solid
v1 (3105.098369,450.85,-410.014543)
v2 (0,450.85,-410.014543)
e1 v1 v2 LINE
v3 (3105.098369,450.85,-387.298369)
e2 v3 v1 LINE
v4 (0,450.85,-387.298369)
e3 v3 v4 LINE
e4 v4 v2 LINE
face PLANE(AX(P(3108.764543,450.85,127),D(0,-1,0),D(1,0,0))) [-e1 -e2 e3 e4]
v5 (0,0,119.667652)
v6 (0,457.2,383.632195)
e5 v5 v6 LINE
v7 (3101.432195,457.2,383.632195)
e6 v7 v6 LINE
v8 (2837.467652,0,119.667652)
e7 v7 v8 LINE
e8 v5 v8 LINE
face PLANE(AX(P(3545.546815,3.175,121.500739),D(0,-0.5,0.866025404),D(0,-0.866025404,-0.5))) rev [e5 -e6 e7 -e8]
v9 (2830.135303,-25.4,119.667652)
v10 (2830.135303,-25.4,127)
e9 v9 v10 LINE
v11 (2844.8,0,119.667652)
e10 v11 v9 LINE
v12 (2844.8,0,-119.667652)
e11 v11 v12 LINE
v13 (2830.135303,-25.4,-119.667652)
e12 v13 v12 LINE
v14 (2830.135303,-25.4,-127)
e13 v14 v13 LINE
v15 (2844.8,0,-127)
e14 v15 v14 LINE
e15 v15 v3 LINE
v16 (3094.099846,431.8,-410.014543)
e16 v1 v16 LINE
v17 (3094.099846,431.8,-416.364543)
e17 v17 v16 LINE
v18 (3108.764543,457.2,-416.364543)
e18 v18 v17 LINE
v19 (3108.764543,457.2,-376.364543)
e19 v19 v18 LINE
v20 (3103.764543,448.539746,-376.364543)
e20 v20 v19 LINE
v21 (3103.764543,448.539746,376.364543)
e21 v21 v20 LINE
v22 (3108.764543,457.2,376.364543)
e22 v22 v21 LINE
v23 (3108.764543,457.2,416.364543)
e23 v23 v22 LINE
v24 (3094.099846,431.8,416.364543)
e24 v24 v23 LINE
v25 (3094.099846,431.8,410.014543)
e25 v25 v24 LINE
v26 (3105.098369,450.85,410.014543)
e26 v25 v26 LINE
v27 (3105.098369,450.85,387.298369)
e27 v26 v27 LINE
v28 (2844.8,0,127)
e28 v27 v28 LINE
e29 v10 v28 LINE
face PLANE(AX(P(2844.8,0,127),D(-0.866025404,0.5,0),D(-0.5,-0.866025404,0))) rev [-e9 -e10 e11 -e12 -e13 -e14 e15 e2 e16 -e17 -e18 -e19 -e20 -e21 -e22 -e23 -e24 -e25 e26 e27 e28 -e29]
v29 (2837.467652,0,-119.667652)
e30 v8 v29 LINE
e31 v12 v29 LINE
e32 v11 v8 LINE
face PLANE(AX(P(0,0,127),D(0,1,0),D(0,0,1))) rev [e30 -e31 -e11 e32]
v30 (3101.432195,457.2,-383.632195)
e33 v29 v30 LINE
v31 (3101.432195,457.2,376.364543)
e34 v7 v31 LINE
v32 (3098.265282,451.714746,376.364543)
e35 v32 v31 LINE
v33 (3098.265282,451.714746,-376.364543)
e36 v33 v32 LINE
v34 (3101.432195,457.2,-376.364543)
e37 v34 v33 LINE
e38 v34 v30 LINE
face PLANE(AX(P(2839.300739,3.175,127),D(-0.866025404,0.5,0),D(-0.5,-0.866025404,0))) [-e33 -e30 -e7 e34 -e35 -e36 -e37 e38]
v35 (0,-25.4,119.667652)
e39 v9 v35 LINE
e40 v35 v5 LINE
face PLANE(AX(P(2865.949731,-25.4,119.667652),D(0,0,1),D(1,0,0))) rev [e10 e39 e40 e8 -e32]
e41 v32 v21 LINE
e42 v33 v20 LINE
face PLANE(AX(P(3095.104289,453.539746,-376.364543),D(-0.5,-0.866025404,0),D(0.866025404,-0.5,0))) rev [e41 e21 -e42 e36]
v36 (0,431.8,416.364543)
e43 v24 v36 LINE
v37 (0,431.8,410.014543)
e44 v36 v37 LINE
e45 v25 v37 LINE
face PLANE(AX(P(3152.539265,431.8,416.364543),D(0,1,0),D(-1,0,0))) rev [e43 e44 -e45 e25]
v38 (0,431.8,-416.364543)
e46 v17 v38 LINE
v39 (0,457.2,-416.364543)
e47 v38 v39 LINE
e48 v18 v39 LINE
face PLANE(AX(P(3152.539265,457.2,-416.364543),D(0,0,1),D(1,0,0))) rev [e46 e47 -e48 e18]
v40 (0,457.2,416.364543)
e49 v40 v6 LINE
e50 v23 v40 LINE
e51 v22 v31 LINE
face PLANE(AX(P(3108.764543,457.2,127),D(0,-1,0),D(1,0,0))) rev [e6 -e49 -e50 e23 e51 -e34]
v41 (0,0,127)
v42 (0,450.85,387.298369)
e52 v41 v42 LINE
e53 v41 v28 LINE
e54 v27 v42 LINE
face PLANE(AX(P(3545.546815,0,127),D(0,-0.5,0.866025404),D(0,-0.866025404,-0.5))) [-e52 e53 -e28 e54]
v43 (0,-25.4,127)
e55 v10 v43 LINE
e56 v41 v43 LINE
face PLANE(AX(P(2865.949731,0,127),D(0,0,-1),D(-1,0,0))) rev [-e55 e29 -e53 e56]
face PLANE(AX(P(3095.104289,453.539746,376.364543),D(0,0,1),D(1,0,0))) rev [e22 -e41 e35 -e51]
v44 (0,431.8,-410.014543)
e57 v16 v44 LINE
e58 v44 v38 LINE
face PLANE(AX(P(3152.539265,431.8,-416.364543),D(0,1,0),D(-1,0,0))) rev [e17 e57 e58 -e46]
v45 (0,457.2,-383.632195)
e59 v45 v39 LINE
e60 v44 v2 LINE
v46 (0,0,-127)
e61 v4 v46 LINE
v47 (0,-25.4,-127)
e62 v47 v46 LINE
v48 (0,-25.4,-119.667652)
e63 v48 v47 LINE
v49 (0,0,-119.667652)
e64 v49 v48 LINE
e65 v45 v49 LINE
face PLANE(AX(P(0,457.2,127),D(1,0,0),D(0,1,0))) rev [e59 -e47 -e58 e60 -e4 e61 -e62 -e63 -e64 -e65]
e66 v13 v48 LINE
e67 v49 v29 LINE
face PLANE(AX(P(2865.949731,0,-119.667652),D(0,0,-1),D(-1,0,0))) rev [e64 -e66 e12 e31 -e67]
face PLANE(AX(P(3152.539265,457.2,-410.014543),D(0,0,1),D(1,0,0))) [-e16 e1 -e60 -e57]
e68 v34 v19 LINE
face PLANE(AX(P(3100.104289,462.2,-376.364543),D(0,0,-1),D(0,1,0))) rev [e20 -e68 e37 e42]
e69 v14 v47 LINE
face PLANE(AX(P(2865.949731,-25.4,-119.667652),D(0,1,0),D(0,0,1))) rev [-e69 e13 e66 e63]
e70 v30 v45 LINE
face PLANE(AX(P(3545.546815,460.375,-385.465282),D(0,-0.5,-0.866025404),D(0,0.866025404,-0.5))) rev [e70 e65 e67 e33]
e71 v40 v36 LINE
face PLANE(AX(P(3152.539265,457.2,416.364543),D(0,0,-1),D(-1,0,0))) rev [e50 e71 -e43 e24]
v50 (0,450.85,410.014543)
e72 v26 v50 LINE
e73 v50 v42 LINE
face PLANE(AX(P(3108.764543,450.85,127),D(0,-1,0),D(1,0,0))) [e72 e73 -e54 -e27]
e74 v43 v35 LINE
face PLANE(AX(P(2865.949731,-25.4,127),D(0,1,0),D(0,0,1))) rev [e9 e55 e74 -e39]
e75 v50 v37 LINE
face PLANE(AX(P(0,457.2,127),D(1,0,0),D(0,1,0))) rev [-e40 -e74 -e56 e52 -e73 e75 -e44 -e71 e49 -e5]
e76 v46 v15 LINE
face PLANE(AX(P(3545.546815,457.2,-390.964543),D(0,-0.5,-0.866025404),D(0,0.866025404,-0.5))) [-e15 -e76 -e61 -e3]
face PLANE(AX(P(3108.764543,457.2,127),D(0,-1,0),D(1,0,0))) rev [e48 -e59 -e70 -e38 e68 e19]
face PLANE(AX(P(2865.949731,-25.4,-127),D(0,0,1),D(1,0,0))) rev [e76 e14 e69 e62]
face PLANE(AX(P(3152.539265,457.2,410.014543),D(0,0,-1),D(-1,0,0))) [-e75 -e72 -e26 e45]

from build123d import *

# Parameters (mm, degrees)
CHUTE_CENTER_DEPTH         = 127
CHUTE_SIDES_REACH          = 3146.77
SHELL1_T                   = -6.35
BOSS_EXTRUDE3_REACH        = 3168.434
SHELL3_DEPTH               = 3105.098368864
BOSS_EXTRUDE4_REACH        = 3171.67
SHELL5_DEPTH               = 3105.098368864
SKETCH11_W                 = 752.729086146
SKETCH11_H                 = 10
CLOSED_END_RELIEF_DEPTH    = 10
LOWER_SUPPORT_FLANGE_REACH = 3171.67
SKETCH12_W                 = 7.332348419
SKETCH12_H                 = 25.4


# Read off the part's stored shape, not the designer's step: Shell3, Shell5
with BuildPart() as part:
    # Sketch1 → Chute Center (new, symmetric)
    with BuildSketch(Plane.XY):
        Polygon((0, 0), (2844.8, 0), (3108.764543073, 457.2), (0, 457.2), align=None)
    extrude(amount=CHUTE_CENTER_DEPTH, both=True)

    # Chute Sides: up to this plane
    chute_sides_end = Plane(origin=(2844.8, 0, 127), z_dir=(-0.8660254037844399, 0.49999999999999784, 0))
    # Sketch2 → Chute Sides (add, up to the surface)
    with BuildSketch(Plane.ZY, mode=Mode.PRIVATE) as chute_sides_sk1:
        Polygon((127, 0), (390.964543073, 457.2), (127, 457.2), align=None)
    chute_sides_tool1 = split(extrude(chute_sides_sk1.sketch, amount=-CHUTE_SIDES_REACH, mode=Mode.PRIVATE), bisect_by=chute_sides_end, keep=Keep.BOTH, mode=Mode.PRIVATE)
    add(chute_sides_tool1.solids().sort_by_distance((0, 304.8, 214.988181))[0])
    # Sketch2 → Chute Sides (add, up to the surface)
    with BuildSketch(Plane.ZY, mode=Mode.PRIVATE) as chute_sides_sk2:
        Polygon((-127, 457.2), (-390.964543073, 457.2), (-127, 0), align=None)
    chute_sides_tool2 = split(extrude(chute_sides_sk2.sketch, amount=-CHUTE_SIDES_REACH, mode=Mode.PRIVATE), bisect_by=chute_sides_end, keep=Keep.BOTH, mode=Mode.PRIVATE)
    add(chute_sides_tool2.solids().sort_by_distance((0, 304.8, -214.988181))[0])

    # Shell1
    shell1_openings = [part.faces().sort_by_distance(p)[0] for p in [
        (1554.382271537, 457.2, 0),
        (1422.4, 0, 0),
        (0, 267.432963474, 0),
    ]]
    offset(amount=SHELL1_T, openings=shell1_openings, kind=Kind.INTERSECTION)

    # Boss-Extrude3: up to this plane
    boss_extrude3_end = Plane(origin=(2844.8, 0, 127), z_dir=(-0.8660254037844399, 0.49999999999999784, 0))
    # Sketch6 → Boss-Extrude3 (add, up to the surface)
    with BuildSketch(Plane(origin=(0, 0, 0), x_dir=(0, 0, -1), z_dir=(1, 0, 0)), mode=Mode.PRIVATE) as boss_extrude3_sk1:
        Polygon((390.964543073, 457.2), (416.364543073, 457.2), (416.364543073, 431.8), (376.299846236, 431.8), align=None)
    boss_extrude3_tool1 = split(extrude(boss_extrude3_sk1.sketch, amount=BOSS_EXTRUDE3_REACH, mode=Mode.PRIVATE), bisect_by=boss_extrude3_end, keep=Keep.BOTH, mode=Mode.PRIVATE)
    add(boss_extrude3_tool1.solids().sort_by_distance((0, 443.551694, -399.724617))[0])

    # Shell3 outline → Shell3 (cut)
    with BuildSketch(Plane.YZ):
        Polygon((450.85, -410.014543073), (450.85, -387.298368864), (431.8, -376.299846236), (431.8, -410.014543073), align=None)
    extrude(amount=SHELL3_DEPTH, mode=Mode.SUBTRACT)

    # Boss-Extrude4: up to this plane
    boss_extrude4_end = Plane(origin=(2844.8, 0, 127), z_dir=(-0.8660254037844399, 0.49999999999999784, 0))
    # Sketch7 → Boss-Extrude4 (add, up to the surface)
    with BuildSketch(Plane(origin=(0, 0, 0), x_dir=(0, 0, -1), z_dir=(1, 0, 0)), mode=Mode.PRIVATE) as boss_extrude4_sk1:
        Polygon((-390.964543073, 457.2), (-416.364543073, 457.2), (-416.364543073, 431.8), (-376.299846236, 431.8), align=None)
    boss_extrude4_tool1 = split(extrude(boss_extrude4_sk1.sketch, amount=BOSS_EXTRUDE4_REACH, mode=Mode.PRIVATE), bisect_by=boss_extrude4_end, keep=Keep.BOTH, mode=Mode.PRIVATE)
    add(boss_extrude4_tool1.solids().sort_by_distance((0, 443.551694, 399.724617))[0])

    # Shell5 outline → Shell5 (cut)
    with BuildSketch(Plane.YZ):
        Polygon((450.85, 387.298368864), (450.85, 410.014543073), (431.8, 410.014543073), (431.8, 376.299846236), align=None)
    extrude(amount=SHELL5_DEPTH, mode=Mode.SUBTRACT)

    # Sketch11 → Closed End Relief (cut)
    with BuildSketch(Plane(origin=(2133.6, -1231.834534343, 0), x_dir=(0, 0, -1), z_dir=(0.86602540378444, -0.49999999999999784, 0))):
        with Locations((0, 1945.329086147)):
            Rectangle(SKETCH11_W, SKETCH11_H)
    extrude(amount=-CLOSED_END_RELIEF_DEPTH, mode=Mode.SUBTRACT)

    # Lower Support Flange: up to this plane
    lower_support_flange_end = Plane(origin=(2844.8, 0, 127), z_dir=(-0.8660254037844399, 0.49999999999999784, 0))
    # Sketch12 → Lower Support Flange (add, up to the surface)
    with BuildSketch(Plane(origin=(0, 0, 0), x_dir=(0, 0, -1), z_dir=(1, 0, 0)), mode=Mode.PRIVATE) as lower_support_flange_sk1:
        with Locations((123.333825791, -12.7)):
            Rectangle(SKETCH12_W, SKETCH12_H)
    lower_support_flange_tool1 = split(extrude(lower_support_flange_sk1.sketch, amount=LOWER_SUPPORT_FLANGE_REACH, mode=Mode.PRIVATE), bisect_by=lower_support_flange_end, keep=Keep.BOTH, mode=Mode.PRIVATE)
    add(lower_support_flange_tool1.solids().sort_by_distance((0, -12.7, -123.333826))[0])
    # Sketch12 → Lower Support Flange (add, up to the surface)
    with BuildSketch(Plane(origin=(0, 0, 0), x_dir=(0, 0, -1), z_dir=(1, 0, 0)), mode=Mode.PRIVATE) as lower_support_flange_sk2:
        with Locations((-123.333825791, -12.7)):
            Rectangle(SKETCH12_W, SKETCH12_H)
    lower_support_flange_tool2 = split(extrude(lower_support_flange_sk2.sketch, amount=LOWER_SUPPORT_FLANGE_REACH, mode=Mode.PRIVATE), bisect_by=lower_support_flange_end, keep=Keep.BOTH, mode=Mode.PRIVATE)
    add(lower_support_flange_tool2.solids().sort_by_distance((0, -12.7, 123.333826))[0])


solid = part.part
